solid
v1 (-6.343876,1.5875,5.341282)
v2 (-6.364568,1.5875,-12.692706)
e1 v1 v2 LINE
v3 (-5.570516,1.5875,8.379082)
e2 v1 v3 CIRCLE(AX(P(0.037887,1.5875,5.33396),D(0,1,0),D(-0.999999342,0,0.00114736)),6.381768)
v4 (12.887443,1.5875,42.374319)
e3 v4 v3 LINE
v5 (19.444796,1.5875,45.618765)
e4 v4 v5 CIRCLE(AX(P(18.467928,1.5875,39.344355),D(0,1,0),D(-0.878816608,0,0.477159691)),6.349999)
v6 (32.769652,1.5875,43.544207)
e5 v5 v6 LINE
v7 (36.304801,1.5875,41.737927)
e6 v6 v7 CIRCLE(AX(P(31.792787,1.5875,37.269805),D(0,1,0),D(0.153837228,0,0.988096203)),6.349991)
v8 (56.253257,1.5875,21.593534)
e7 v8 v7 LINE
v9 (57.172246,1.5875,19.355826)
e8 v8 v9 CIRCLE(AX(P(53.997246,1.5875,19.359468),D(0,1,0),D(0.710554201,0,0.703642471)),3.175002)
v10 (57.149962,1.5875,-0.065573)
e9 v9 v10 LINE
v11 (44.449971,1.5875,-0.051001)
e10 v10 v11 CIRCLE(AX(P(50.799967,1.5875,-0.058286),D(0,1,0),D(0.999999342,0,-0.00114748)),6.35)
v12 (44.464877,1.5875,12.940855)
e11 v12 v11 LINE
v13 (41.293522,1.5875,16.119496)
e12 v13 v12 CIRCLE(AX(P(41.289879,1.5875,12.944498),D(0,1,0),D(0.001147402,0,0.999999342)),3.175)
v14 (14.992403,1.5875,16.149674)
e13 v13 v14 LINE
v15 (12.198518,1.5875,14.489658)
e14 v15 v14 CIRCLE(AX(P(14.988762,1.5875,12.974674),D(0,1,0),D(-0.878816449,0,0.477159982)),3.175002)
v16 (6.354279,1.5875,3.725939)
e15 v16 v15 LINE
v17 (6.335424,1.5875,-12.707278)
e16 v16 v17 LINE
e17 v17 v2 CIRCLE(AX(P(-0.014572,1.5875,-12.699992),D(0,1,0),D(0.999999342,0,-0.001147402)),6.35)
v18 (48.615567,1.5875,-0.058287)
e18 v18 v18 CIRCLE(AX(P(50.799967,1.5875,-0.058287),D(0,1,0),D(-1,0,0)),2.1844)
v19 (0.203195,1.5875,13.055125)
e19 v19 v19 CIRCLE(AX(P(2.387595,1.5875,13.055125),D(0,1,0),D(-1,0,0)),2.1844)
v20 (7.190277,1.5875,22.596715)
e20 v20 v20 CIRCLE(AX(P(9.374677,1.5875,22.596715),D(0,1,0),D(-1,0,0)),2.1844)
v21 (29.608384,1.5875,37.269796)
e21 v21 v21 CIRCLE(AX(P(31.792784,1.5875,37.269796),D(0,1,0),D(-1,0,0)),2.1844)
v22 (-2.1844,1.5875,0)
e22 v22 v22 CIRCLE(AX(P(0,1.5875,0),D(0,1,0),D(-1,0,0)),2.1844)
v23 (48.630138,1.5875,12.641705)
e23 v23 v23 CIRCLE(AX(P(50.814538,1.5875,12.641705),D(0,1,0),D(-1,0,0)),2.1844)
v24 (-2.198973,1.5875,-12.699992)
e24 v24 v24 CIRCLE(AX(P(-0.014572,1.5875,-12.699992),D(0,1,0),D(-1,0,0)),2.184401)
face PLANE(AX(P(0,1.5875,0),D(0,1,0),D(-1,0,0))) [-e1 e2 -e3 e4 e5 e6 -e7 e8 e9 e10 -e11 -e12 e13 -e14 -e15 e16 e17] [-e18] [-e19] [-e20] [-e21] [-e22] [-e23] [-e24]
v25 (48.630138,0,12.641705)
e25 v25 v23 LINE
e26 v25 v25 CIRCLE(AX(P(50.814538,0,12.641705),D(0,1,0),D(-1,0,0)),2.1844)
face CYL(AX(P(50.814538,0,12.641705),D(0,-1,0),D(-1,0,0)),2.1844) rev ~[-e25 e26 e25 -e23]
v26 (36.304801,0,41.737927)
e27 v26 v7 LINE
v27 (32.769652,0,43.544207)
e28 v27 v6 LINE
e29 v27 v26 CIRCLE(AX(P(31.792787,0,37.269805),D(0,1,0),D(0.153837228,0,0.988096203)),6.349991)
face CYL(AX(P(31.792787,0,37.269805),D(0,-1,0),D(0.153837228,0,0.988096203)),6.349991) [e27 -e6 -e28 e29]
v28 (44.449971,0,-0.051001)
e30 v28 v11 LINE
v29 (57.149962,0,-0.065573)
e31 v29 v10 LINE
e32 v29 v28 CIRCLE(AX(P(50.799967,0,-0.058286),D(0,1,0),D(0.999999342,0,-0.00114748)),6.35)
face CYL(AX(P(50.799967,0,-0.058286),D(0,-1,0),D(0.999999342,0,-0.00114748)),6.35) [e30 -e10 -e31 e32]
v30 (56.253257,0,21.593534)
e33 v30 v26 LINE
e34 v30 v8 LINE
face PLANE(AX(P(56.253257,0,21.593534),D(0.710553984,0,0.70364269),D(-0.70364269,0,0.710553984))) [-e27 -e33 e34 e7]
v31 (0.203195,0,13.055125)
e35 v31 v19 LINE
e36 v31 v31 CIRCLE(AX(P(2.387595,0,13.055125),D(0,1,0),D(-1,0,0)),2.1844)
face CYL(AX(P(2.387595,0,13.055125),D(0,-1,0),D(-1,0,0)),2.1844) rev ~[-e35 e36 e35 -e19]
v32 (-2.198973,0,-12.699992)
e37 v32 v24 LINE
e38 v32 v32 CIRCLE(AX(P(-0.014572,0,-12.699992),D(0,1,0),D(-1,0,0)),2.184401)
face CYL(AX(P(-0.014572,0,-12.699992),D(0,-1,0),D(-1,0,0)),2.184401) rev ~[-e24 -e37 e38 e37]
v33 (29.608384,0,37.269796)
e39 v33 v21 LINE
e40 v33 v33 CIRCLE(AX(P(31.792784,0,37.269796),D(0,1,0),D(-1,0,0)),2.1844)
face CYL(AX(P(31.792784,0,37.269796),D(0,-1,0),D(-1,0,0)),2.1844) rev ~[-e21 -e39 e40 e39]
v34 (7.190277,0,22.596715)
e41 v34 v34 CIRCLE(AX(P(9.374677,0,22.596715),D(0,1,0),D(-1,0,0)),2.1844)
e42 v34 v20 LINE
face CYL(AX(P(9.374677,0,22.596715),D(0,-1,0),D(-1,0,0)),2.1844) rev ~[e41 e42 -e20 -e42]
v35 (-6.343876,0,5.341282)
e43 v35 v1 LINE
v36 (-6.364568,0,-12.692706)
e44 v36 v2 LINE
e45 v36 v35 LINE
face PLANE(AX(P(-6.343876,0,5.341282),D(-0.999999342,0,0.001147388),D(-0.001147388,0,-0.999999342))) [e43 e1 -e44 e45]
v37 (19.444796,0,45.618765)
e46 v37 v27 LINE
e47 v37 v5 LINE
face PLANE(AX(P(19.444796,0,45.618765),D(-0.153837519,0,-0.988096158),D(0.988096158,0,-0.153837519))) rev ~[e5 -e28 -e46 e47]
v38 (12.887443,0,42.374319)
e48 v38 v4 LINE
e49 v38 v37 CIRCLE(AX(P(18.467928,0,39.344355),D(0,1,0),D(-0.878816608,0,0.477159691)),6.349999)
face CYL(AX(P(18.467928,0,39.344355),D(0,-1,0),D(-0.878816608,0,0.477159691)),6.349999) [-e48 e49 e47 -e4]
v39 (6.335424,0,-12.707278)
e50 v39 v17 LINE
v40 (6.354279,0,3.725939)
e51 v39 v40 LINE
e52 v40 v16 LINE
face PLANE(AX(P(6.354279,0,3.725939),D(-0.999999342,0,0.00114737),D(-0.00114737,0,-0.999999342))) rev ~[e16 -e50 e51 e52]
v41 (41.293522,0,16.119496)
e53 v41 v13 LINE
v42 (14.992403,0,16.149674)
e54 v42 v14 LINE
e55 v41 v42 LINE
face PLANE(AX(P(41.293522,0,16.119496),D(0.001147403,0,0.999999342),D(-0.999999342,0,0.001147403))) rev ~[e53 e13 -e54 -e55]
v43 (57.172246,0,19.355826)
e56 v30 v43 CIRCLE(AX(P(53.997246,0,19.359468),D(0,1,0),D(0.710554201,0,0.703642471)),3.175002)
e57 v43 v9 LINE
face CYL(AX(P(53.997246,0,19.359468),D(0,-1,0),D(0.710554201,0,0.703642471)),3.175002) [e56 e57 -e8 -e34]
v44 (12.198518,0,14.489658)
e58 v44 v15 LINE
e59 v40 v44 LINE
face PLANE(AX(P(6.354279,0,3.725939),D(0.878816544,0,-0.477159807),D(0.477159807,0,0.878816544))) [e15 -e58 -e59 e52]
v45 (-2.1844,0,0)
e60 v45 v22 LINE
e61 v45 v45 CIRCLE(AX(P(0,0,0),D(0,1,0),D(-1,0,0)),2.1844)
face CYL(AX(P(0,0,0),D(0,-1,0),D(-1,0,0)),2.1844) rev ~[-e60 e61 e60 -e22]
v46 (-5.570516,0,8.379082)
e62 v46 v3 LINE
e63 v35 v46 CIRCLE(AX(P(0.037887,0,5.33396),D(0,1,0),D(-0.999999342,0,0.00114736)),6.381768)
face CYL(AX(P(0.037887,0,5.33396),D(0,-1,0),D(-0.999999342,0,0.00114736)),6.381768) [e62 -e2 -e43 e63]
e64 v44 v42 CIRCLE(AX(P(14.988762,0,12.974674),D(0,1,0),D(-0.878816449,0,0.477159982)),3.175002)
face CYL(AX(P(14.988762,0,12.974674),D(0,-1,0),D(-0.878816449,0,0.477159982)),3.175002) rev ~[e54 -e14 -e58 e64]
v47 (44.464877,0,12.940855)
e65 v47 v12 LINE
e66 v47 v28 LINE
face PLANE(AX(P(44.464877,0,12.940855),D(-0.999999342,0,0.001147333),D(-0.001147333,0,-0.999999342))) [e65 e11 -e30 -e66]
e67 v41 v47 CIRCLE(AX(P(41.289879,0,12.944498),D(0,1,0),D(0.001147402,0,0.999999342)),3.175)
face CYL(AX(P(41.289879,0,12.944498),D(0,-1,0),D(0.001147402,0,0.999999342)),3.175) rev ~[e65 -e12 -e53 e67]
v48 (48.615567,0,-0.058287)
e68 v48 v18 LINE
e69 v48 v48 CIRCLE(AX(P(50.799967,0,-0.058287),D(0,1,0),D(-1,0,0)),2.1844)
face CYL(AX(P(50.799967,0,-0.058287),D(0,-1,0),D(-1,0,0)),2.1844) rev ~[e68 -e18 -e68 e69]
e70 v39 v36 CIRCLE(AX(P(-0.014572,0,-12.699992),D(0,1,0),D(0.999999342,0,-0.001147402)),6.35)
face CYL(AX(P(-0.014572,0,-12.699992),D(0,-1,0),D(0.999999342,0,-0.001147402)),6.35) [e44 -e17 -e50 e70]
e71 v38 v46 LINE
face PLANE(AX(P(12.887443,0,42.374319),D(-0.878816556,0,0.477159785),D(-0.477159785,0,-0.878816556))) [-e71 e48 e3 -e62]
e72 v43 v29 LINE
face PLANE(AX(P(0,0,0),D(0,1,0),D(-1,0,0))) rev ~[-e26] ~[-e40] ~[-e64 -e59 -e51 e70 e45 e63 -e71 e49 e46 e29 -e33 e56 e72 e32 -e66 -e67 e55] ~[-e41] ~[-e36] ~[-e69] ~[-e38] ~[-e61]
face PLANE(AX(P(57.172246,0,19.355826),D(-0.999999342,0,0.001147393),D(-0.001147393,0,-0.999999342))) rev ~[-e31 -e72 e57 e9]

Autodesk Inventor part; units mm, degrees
ref_plane "YZ Plane" through (0, 0, 0) normal (1, 0, 0) x (0, 1, 0)
ref_plane "XZ Plane" through (0, 0, 0) normal (0, 1, 0) x (-1, 0, 0)
ref_plane "XY Plane" through (0, 0, 0) normal (0, 0, 1) x (1, 0, 0)
sketch "main" plane through (0, 0, 0) normal (0, 0, 1) x (1, 0, 0)
  circle A0 centre (12.325875, 33.112504) radius 2.1844
  line L0 (25.390984, 29.120631) -> (25.316771, 29.135118)
  line L1 (20.04973, 41.835118) -> (13.667964, 35.453352) construction
  arc A1 (20.04973, 41.835118) -> (17.011045, 41.065244) centre (20.04973, 35.453352) ccw
  circle A2 centre (25.38373, 35.485118) radius 2.1844
  line L2 (20.04973, 41.835118) -> (29.074911, 41.835118) construction
  arc A3 (25.38373, 41.835118) -> (25.38373, 41.835118) centre (25.38373, 35.485118) ccw
  circle A4 centre (12.68373, -15.314882) radius 2.1844
  circle A5 centre (-11.92252, 3.735118) radius 2.1844
  arc A6 (-18.198047, 2.765449) -> (-16.395825, -0.77177) centre (-11.92252, 3.735118) ccw
  line L3 (-20.257316, 16.092677) -> (-18.198047, 2.765449)
  line L4 (12.391865, -8.964882) -> (25.38373, -8.964882)
  circle A7 centre (25.38373, -15.314882) radius 2.1844
  arc A8 (25.38373, -21.664882) -> (25.38373, -8.964882) centre (25.38373, -15.314882) ccw
  line L5 (5.962319, -21.664882) -> (25.38373, -21.664882)
  line L6 (3.725666, -20.743326) -> (-16.395825, -0.77177)
  line L7 (21.760398, 29.194623) -> (10.880086, 23.303233)
  line L8 (-17.005348, 22.646303) -> (17.011045, 41.065244)
  circle A9 centre (2.776273, 26.136374) radius 2.1844
  arc A10 (-17.005348, 22.646303) -> (-20.257316, 16.092677) centre (-13.981788, 17.062345) ccw
  line L9 (9.216865, -5.789882) -> (9.216865, 20.511254)
  arc A11 (9.216865, -5.789882) -> (12.391865, -8.964882) centre (12.391865, -5.789882) ccw
  arc A12 (10.880086, 23.303233) -> (9.216865, 20.511254) centre (12.391865, 20.511254) ccw
  arc A13 (3.725666, -20.743326) -> (5.962319, -21.664882) centre (5.962319, -18.489882) ccw
  arc A14 (38.08373, 29.135118) -> (38.08373, 41.835118) centre (38.08373, 35.485118) ccw
  line L10 (20.04973, 41.835118) -> (38.08373, 41.835118)
  line L11 (21.650503, 29.135118) -> (38.08373, 29.135118)
  circle A15 centre (38.08373, 35.485118) radius 2.184401
  point P0 (7.427211, 10.378199)
  point P1 (19.03373, 40.819118)
  point P2 (-20.9407, 20.515419)
  point P3 (9.216865, -8.964882)
  point P4 (-30.17877, -11.346132)
  dimension "d0" = 4.3688
  dimension "d2" = 12.7
  dimension "d3" = 6.35
  dimension "d4" = 12.7
  dimension "d5" = 4.3688
  dimension "d6" = 4.3688
  dimension "d9" = 6.35
  dimension "d10" = 31.75
  dimension "d11" = 37.30625
  dimension "d16" = 6.35
  dimension "d18" = 3.175
  dimension "d21" = 4.7625
  dimension "d22" = 3.175
  dimension "d23" = 12.7
  dimension "d24" = 12.7
  dimension "d25" = 6.35
  dimension "d26" = 13.32723
sketch "Sketch1" plane through (0, 0, 0) normal (0, 1, 0) x (-1, 0, 0)
  circle A0 centre (-2.387595, 13.055125) radius 2.1844
  line L0 (-6.364475, -0.014556) -> (-6.350073, 0.059673)
  line L1 (6.343876, 5.341282) -> (-0.045209, 11.715722) construction
  arc A1 (6.343876, 5.341282) -> (5.570516, 8.379082) centre (-0.037886, 5.33396) ccw
  circle A2 centre (0, 0) radius 2.1844
  line L2 (6.343876, 5.341282) -> (6.354231, -3.683892) construction
  arc A3 (6.349996, 0.007286) -> (6.349996, 0.007286) centre (0, 0) ccw
  circle A4 centre (-50.814538, 12.641705) radius 2.1844
  circle A5 centre (-31.792784, 37.269796) radius 2.1844
  arc A6 (-32.769652, 43.544207) -> (-36.304801, 41.737927) centre (-31.792784, 37.269796) ccw
  line L3 (-19.444796, 45.618765) -> (-32.769652, 43.544207)
  line L4 (-44.464877, 12.940855) -> (-44.449971, -0.051001)
  circle A7 centre (-50.799967, -0.058287) radius 2.1844
  arc A8 (-57.149962, -0.065573) -> (-44.449971, -0.051001) centre (-50.799967, -0.058287) ccw
  line L5 (-57.172246, 19.355826) -> (-57.149962, -0.065573)
  line L6 (-56.253257, 21.593534) -> (-36.304801, 41.737927)
  line L7 (-6.294648, 3.616113) -> (-12.198518, 14.489658)
  line L8 (-12.887443, 42.374319) -> (5.570516, 8.379082)
  circle A9 centre (-9.374677, 22.596715) radius 2.1844
  arc A10 (-12.887443, 42.374319) -> (-19.444796, 45.618765) centre (-18.467928, 39.344355) ccw
  line L9 (-41.293522, 16.119496) -> (-14.992403, 16.149674)
  arc A11 (-41.293522, 16.119496) -> (-44.464877, 12.940855) centre (-41.289879, 12.944498) ccw
  arc A12 (-12.198518, 14.489658) -> (-14.992403, 16.149674) centre (-14.98876, 12.974676) ccw
  arc A13 (-56.253257, 21.593534) -> (-57.172246, 19.355826) centre (-53.997248, 19.359469) ccw
  arc A14 (-6.335424, -12.707278) -> (6.364568, -12.692706) centre (0.014572, -12.699992) ccw
  line L10 (6.343876, 5.341282) -> (6.364568, -12.692706)
  line L11 (-6.354279, 3.725939) -> (-6.335424, -12.707278)
  circle A15 centre (0.014572, -12.699992) radius 2.184401
  point P0 (0, 0)
extrude "Extrusion1" add sketch "Sketch1" along normal blind 1.5875
properties part number "Ring Funnel" material "Acetal Resin, White"
